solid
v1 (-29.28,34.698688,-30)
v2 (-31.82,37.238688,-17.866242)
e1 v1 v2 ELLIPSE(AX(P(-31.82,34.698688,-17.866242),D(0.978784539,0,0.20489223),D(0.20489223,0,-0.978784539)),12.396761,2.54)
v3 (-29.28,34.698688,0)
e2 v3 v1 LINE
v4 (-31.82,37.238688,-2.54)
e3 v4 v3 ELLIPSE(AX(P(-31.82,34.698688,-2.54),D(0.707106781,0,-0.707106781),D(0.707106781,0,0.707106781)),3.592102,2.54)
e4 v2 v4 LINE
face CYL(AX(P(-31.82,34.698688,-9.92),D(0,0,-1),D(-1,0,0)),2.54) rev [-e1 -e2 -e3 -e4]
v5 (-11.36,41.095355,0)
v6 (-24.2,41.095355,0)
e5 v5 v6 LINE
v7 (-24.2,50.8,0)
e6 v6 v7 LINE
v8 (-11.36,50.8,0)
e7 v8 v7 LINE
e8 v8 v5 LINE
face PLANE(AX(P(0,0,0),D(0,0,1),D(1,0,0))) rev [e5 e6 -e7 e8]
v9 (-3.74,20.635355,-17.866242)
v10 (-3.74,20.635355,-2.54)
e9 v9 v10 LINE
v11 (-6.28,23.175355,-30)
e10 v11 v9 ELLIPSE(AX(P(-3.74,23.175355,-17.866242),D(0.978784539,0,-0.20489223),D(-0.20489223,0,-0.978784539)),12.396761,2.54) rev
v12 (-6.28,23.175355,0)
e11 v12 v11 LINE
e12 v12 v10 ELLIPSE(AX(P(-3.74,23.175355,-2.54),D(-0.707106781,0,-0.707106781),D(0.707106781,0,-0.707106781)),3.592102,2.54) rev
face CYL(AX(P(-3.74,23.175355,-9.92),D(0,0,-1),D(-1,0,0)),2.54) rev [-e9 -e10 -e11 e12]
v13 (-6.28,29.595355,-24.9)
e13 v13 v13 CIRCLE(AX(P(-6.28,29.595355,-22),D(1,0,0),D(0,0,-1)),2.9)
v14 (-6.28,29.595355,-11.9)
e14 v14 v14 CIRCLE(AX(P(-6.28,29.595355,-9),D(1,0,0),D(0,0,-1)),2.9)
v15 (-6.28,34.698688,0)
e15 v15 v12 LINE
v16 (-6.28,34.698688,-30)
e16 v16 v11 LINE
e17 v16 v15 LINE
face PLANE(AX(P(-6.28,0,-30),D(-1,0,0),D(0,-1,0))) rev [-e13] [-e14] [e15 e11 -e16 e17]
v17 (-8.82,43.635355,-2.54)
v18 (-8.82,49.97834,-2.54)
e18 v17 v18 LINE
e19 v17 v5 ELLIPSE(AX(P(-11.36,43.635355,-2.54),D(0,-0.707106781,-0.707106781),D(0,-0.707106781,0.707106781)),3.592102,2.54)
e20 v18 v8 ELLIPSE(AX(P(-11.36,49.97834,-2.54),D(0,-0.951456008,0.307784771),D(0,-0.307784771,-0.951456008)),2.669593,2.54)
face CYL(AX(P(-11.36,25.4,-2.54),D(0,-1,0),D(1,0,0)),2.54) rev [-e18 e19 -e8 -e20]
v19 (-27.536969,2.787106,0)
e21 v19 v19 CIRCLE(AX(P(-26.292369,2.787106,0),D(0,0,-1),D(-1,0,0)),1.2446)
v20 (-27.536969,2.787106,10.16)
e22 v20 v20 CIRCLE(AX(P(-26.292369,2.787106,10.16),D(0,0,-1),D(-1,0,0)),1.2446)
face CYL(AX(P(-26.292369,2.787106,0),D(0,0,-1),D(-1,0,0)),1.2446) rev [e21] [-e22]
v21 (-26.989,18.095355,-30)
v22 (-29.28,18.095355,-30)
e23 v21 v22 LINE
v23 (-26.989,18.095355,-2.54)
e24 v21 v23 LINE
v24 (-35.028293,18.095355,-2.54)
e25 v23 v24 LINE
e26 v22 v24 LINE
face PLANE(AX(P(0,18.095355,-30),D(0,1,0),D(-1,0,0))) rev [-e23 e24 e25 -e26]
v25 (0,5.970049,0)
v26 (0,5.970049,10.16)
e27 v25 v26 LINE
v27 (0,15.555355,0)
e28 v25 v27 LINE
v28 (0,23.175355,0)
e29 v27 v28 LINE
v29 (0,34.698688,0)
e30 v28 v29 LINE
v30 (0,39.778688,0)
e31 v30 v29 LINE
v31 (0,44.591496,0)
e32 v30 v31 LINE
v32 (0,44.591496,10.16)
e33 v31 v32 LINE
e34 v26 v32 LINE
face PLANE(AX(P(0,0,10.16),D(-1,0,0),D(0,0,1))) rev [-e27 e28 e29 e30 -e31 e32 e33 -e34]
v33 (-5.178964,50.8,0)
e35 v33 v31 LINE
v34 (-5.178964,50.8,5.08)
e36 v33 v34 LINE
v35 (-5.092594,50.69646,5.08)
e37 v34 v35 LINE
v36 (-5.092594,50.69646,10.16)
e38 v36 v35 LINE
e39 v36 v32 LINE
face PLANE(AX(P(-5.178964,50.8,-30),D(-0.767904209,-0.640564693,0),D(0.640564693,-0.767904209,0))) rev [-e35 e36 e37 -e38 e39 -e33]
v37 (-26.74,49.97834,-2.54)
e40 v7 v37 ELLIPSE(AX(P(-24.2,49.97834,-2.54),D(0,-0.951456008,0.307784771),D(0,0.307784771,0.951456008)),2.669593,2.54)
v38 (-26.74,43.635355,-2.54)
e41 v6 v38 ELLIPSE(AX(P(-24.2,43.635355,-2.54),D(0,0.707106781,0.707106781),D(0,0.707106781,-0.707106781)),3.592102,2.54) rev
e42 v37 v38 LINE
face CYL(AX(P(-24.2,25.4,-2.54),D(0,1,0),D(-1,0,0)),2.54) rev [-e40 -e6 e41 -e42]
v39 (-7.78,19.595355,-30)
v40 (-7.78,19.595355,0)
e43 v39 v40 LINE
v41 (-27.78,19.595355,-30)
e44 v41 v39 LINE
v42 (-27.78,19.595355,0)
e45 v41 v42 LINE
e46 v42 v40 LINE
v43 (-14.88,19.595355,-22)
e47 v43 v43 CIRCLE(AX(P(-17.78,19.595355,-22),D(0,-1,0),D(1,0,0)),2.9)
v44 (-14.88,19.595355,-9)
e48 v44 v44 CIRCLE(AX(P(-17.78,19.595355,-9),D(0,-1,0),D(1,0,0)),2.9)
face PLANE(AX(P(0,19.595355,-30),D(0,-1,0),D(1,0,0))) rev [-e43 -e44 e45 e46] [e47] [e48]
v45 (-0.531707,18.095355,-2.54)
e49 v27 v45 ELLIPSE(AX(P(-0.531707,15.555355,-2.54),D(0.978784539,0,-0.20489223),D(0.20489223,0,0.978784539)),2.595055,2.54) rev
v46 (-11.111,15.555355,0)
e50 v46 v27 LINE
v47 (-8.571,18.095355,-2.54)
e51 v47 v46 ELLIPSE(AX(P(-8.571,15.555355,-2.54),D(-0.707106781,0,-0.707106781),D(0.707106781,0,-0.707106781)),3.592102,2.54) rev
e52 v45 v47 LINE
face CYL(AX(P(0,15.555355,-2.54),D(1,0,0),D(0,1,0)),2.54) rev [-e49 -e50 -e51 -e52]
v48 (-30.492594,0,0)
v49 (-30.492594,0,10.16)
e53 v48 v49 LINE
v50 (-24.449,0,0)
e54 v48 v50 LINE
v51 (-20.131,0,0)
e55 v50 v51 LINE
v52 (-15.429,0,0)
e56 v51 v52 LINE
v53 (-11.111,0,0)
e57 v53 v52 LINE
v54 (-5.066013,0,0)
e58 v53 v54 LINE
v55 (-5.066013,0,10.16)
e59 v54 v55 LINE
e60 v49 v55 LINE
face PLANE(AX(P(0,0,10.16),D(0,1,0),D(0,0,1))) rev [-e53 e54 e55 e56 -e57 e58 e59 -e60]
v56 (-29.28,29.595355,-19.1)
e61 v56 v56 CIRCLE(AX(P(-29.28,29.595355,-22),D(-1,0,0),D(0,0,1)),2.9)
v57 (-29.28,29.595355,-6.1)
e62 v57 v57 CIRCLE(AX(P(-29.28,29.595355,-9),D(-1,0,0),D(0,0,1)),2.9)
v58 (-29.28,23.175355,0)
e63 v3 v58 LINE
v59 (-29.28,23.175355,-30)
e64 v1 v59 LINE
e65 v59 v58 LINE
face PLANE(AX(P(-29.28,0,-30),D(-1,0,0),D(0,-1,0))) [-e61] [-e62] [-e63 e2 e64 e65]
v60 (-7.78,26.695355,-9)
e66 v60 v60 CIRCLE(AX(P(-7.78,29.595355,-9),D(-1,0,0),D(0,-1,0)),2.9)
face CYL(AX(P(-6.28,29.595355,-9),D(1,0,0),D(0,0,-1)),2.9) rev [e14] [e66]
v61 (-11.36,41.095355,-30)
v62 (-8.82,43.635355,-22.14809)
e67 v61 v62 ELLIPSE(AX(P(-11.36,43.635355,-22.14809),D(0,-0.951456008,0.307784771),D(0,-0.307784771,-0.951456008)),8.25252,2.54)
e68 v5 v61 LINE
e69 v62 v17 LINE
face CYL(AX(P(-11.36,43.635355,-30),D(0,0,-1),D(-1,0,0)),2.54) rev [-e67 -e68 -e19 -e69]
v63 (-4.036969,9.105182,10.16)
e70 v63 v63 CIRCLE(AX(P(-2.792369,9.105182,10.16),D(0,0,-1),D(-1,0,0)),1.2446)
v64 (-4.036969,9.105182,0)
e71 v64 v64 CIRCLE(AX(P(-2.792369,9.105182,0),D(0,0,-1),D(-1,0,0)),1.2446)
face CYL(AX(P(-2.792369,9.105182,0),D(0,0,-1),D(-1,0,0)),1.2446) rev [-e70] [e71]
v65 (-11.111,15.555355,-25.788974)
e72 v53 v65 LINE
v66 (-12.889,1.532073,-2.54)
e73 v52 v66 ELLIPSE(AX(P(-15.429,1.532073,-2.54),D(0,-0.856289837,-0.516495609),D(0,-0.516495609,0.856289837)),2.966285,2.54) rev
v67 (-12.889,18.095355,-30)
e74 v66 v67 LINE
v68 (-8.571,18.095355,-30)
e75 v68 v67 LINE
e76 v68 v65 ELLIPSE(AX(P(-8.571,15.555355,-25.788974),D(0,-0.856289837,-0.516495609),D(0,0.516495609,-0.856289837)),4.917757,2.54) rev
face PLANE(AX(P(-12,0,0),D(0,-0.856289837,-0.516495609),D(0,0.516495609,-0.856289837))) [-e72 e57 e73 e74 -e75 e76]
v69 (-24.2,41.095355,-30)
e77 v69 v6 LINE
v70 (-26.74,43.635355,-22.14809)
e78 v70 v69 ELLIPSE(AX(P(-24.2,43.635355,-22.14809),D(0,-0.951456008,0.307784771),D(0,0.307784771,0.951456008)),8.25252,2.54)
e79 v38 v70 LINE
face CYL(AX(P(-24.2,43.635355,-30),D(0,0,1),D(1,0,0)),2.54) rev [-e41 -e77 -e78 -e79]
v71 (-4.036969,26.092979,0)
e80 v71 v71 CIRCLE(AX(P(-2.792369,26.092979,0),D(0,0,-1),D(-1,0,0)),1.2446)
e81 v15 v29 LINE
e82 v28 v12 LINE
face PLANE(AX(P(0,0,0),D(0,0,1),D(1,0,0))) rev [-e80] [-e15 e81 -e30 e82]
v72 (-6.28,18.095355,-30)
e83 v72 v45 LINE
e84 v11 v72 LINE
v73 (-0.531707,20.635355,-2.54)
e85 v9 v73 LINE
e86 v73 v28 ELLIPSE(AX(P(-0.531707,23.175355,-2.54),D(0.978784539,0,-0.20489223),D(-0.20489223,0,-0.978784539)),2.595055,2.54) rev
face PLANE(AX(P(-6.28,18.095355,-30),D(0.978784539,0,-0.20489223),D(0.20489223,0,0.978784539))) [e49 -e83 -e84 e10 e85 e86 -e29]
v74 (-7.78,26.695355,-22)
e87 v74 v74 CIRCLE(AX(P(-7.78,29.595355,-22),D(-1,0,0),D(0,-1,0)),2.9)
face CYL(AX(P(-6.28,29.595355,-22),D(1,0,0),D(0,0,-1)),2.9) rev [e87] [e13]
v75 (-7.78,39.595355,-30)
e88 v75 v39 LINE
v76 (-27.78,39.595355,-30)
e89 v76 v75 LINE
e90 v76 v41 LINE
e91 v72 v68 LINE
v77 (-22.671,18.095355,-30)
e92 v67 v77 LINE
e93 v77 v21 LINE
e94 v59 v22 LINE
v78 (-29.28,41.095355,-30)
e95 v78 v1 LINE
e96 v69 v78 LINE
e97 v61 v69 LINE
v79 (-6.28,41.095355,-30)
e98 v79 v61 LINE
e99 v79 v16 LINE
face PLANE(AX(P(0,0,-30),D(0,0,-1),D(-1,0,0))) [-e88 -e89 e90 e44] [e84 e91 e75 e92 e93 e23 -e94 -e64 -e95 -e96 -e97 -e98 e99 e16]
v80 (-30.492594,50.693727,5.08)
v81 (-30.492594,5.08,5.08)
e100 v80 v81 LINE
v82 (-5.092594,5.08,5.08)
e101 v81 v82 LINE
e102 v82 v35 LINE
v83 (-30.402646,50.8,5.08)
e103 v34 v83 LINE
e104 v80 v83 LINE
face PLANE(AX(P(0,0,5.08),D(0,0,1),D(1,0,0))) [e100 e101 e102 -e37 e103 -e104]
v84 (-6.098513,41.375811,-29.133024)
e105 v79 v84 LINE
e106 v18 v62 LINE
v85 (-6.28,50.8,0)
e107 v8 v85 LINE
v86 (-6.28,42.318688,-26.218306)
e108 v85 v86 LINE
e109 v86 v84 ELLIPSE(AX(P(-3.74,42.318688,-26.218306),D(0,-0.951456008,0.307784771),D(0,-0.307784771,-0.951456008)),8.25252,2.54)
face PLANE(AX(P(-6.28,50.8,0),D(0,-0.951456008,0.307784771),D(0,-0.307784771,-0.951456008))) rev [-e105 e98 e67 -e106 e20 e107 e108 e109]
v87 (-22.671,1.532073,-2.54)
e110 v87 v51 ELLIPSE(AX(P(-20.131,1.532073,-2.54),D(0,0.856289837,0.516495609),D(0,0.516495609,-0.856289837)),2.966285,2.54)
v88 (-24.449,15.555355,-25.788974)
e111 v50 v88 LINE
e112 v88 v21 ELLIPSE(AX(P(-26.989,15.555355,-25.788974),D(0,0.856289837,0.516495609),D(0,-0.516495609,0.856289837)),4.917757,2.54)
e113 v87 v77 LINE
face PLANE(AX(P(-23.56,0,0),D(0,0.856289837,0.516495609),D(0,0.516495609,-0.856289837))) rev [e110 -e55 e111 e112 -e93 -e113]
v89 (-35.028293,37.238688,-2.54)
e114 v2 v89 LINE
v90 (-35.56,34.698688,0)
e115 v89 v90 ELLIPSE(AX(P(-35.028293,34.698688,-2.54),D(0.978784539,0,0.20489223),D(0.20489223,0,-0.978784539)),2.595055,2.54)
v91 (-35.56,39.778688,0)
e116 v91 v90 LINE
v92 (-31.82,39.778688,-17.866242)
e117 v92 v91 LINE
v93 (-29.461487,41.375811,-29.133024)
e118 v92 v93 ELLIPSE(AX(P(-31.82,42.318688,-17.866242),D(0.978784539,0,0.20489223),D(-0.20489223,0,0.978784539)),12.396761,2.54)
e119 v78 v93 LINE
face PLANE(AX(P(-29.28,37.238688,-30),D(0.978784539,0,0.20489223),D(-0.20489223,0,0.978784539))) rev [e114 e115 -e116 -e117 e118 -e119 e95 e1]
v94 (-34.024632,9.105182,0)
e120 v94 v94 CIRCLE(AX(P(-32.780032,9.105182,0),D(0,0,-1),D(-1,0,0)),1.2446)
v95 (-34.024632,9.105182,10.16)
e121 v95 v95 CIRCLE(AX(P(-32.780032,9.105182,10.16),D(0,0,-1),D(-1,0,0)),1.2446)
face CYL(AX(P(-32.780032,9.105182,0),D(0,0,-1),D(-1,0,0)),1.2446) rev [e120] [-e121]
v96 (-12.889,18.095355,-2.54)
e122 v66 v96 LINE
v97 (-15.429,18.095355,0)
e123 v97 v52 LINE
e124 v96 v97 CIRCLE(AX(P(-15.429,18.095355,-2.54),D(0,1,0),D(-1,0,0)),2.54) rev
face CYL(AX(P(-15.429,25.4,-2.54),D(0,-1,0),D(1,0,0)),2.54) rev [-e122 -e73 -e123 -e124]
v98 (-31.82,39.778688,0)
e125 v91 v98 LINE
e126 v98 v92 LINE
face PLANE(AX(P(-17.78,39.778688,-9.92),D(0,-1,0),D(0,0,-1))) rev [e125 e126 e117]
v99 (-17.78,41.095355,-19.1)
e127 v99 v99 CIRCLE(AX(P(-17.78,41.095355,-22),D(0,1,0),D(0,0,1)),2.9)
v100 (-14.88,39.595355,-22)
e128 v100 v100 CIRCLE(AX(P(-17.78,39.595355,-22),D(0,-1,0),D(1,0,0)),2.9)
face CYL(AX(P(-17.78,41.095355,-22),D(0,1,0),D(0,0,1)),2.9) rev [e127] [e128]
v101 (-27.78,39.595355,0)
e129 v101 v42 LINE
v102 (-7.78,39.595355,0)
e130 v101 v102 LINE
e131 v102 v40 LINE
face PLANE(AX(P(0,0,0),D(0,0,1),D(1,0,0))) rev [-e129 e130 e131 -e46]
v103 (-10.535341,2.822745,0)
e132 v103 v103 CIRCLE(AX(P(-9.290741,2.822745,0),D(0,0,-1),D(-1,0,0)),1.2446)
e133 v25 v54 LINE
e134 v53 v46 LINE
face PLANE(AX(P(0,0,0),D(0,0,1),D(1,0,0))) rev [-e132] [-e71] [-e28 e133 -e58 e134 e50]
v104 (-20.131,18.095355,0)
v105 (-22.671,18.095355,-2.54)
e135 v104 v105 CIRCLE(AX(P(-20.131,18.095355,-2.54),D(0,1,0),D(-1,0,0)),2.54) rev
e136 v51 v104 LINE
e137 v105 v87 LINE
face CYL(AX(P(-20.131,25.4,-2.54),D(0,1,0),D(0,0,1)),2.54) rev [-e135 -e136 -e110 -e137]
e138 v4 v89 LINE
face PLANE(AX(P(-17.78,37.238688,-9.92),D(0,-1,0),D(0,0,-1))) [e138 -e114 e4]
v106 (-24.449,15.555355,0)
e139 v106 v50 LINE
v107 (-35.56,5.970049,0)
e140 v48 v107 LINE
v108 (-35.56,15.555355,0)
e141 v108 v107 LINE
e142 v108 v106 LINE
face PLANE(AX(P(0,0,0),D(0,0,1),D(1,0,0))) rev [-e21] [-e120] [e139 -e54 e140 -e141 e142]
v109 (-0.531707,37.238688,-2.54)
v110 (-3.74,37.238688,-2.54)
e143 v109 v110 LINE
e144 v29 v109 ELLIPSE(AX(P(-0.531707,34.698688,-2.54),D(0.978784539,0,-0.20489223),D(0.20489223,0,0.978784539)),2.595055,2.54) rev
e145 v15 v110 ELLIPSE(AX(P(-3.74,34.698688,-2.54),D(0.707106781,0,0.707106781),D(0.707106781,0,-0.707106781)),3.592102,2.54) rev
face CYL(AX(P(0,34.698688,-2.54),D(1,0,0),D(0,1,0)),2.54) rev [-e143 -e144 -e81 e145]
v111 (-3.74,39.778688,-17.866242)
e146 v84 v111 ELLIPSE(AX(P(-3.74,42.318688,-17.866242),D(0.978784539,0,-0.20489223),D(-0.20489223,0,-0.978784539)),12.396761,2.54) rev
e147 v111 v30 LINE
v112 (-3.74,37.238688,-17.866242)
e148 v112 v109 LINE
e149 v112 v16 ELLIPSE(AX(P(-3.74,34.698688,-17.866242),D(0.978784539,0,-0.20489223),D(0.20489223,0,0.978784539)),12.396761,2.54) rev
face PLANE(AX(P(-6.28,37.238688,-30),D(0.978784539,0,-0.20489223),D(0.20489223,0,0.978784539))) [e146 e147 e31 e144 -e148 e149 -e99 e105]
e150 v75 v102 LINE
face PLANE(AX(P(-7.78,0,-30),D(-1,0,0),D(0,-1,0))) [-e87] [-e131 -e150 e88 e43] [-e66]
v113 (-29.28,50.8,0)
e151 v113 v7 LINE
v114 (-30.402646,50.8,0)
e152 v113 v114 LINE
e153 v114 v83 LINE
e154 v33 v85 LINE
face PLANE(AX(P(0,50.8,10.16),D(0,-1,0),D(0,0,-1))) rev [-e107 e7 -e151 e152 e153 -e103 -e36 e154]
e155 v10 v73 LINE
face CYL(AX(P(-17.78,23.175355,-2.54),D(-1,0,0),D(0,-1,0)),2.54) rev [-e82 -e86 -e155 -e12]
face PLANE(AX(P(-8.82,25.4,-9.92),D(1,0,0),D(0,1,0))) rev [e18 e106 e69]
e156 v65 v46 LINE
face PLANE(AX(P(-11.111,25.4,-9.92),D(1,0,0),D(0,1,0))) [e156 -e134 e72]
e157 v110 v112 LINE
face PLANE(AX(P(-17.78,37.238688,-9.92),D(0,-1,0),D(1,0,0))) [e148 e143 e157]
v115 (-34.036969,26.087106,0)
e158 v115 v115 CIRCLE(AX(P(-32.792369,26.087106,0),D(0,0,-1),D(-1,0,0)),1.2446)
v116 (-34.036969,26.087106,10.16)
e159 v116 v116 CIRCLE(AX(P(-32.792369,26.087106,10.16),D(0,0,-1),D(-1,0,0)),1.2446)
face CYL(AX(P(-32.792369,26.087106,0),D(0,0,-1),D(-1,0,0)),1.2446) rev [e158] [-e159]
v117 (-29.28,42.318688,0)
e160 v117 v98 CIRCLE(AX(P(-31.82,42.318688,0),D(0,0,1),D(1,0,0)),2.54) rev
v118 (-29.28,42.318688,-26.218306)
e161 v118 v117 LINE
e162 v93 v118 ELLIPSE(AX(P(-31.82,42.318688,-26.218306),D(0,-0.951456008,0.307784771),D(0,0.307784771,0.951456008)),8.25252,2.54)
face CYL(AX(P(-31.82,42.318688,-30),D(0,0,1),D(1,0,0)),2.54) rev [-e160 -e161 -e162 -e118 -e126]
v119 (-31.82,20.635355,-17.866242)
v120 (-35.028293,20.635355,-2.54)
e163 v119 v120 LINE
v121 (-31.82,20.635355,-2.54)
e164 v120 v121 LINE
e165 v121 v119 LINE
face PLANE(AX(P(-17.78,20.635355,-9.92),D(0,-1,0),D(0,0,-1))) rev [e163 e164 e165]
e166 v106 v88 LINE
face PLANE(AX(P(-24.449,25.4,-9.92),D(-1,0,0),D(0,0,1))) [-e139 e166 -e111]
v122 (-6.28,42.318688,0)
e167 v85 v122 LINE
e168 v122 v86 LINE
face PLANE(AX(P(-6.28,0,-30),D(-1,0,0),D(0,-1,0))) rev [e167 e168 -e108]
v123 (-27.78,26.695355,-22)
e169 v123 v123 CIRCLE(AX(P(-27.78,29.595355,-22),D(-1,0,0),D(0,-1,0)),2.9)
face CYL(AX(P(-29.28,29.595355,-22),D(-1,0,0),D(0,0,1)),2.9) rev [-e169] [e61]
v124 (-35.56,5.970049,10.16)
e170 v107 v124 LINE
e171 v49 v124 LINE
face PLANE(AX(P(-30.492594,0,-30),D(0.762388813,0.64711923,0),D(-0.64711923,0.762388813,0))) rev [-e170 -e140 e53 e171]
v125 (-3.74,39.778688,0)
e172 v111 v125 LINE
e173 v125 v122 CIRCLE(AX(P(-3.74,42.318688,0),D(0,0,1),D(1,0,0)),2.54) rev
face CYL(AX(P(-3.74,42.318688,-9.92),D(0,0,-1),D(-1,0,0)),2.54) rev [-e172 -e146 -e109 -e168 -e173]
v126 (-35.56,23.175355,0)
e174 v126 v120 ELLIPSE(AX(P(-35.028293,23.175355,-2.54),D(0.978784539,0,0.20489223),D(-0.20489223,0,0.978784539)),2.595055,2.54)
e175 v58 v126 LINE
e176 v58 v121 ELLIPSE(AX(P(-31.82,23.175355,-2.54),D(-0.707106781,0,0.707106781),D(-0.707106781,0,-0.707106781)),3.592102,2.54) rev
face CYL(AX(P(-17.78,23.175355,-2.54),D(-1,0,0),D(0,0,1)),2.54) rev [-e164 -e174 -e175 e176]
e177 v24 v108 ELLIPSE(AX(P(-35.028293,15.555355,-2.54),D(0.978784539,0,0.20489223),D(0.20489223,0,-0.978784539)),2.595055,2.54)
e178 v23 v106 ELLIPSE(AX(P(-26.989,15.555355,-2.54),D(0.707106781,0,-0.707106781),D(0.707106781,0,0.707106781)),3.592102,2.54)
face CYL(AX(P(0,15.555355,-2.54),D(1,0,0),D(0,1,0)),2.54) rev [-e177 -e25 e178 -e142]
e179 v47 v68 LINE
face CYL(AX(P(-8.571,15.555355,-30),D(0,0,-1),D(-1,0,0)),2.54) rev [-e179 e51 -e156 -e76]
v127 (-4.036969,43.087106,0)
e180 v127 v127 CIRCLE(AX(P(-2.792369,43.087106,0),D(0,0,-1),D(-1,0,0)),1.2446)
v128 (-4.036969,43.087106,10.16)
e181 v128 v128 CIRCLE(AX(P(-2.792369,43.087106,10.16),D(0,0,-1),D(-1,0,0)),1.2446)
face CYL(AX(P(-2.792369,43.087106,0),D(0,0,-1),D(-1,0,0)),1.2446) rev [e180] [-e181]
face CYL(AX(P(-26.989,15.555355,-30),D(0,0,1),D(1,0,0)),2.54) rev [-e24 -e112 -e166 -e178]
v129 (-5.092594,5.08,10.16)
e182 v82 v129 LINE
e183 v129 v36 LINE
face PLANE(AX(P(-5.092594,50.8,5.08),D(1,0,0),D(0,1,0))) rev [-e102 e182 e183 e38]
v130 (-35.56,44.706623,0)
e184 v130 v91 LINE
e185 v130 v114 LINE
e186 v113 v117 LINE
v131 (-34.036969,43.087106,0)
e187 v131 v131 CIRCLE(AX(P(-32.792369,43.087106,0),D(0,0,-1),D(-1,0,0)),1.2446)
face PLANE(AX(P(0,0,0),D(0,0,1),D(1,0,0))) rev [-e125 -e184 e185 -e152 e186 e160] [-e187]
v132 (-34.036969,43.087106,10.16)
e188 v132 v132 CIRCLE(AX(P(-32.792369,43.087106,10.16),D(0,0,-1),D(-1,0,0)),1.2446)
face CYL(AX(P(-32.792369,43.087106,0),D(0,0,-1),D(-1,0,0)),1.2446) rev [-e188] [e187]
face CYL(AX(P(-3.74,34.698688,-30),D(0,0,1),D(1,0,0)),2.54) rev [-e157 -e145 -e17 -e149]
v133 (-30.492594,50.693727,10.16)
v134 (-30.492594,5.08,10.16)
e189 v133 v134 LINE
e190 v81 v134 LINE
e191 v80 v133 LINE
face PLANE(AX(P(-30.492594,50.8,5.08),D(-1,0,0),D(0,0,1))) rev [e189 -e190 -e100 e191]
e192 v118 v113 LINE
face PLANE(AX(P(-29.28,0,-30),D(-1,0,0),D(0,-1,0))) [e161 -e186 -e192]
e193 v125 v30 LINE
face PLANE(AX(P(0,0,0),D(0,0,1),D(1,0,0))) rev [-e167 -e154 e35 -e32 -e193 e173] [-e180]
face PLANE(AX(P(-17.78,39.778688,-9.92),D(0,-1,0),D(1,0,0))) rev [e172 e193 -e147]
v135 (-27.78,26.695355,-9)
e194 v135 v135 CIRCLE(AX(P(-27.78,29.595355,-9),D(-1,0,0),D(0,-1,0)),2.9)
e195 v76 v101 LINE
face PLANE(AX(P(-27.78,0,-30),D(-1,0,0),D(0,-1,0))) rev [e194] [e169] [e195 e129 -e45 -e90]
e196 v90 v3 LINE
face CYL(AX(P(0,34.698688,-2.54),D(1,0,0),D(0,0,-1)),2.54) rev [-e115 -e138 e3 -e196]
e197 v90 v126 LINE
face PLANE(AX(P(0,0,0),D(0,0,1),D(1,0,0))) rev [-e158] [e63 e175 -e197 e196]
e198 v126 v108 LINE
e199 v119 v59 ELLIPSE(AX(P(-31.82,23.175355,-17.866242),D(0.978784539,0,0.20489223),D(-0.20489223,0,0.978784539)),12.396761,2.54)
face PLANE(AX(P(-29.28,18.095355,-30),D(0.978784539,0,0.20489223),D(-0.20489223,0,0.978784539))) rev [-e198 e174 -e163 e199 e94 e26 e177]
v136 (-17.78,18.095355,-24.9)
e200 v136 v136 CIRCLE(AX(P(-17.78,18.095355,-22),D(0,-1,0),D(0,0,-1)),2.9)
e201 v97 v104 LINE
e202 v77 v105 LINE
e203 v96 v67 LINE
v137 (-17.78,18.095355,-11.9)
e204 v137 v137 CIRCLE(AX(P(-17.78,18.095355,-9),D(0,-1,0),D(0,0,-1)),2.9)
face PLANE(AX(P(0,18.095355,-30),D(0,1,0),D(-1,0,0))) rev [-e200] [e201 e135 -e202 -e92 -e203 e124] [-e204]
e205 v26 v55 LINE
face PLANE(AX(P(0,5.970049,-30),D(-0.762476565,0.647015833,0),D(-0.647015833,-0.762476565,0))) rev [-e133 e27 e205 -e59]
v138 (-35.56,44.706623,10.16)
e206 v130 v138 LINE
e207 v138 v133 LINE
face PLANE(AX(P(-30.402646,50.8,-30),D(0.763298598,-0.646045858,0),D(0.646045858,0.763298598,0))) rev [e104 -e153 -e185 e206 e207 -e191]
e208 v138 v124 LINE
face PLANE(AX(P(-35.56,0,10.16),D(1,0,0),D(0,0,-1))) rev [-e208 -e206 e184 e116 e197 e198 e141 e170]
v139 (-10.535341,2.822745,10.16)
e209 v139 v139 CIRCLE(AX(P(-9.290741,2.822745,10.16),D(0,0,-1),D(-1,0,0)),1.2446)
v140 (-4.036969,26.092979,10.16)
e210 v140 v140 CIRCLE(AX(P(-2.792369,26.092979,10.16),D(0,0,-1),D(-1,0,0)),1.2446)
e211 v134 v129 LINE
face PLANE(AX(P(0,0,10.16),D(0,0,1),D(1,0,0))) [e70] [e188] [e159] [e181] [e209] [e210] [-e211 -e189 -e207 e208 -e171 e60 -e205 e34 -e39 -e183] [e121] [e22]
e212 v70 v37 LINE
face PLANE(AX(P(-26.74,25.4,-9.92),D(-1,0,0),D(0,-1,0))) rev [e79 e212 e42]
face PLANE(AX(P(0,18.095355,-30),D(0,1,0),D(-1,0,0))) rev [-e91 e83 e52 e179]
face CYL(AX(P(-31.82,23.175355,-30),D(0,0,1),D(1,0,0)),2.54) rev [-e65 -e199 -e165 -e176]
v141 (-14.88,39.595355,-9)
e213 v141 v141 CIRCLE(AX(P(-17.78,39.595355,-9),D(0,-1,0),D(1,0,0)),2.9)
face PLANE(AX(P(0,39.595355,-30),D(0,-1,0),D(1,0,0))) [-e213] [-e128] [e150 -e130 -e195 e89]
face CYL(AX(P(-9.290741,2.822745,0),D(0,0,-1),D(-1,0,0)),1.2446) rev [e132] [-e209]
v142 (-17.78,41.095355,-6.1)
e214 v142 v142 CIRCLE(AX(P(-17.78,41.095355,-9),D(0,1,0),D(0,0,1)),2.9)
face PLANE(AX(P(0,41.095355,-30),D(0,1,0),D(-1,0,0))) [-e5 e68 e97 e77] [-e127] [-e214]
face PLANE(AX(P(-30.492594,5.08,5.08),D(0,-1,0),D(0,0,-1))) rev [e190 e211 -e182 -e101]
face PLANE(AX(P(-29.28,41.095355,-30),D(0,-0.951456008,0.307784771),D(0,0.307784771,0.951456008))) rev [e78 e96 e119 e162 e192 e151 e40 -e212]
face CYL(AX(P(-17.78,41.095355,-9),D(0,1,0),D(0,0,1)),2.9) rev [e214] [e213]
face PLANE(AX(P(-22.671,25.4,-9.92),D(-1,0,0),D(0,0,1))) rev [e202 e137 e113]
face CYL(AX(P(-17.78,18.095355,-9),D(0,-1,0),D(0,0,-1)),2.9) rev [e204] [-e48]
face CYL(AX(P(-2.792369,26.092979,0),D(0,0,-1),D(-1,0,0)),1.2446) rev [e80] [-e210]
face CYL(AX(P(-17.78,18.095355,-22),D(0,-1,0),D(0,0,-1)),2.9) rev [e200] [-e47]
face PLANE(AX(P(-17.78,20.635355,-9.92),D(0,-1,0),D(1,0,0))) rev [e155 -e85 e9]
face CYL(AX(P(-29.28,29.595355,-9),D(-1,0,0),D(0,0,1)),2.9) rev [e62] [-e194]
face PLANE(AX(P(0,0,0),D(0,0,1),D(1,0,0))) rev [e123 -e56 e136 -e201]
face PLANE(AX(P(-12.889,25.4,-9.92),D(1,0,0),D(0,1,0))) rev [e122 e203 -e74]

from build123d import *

# Parameters (mm, degrees)
SKETCH1_W                     = 35.56
SKETCH1_H                     = 50.8
BOSS_EXTRUDE1_DEPTH           = 10.16
SKETCH2_W                     = 25.4
SKETCH2_H                     = 45.72
CUT_EXTRUDE2_DEPTH            = 5.08
F_40_0_098_DIAMETER_HOLE1_D   = 2.4892
SKETCH7_W                     = 23
SKETCH7_H                     = 23
SKETCH7_W_2                   = 20
SKETCH7_H_2                   = 20
BOSS_EXTRUDE2_DEPTH           = 30
CUT_EXTRUDE3_DEPTH            = 74.878137497
RIB17_REACH                   = 58.869
SKETCH12_WALL_W               = 146.388686102
SKETCH12_WALL_H               = 2.54
M5_CLEARANCE_HOLE2_AT_2_COUNT = 2
M5_CLEARANCE_HOLE2_AT_2_PITCH = 12.999999966
CIRPATTERN2_COUNT             = 4
LPATTERN3_COUNT               = 2
LPATTERN3_PITCH               = 19.143333316
MIRROR2_COPY_1_REACH          = 58.869
MIRROR2_COPY_1_SKETCH_W       = 146.388686102
MIRROR2_COPY_1_SKETCH_H       = 2.54
RIB18_REACH                   = 67.863
SKETCH20_WALL_W               = 165.256981074
SKETCH20_WALL_H               = 2.54
RIB19_START                   = -2.54
RIB19_DEPTH                   = 2.54
RIB27_REACH                   = 65.527
SKETCH23_WALL_W               = 164.089399604
SKETCH23_WALL_H               = 1.778
FILLET1_R                     = 2.54


# Read off the part's stored shape, not the designer's step: Rib19
with BuildPart() as part:
    # Sketch1 → Boss-Extrude1 (new body)
    with BuildSketch(Plane.XY):
        with Locations((-17.78, 25.4)):
            Rectangle(SKETCH1_W, SKETCH1_H)
    extrude(amount=BOSS_EXTRUDE1_DEPTH)

    # Sketch2 → Cut-Extrude2 (cut)
    with BuildSketch(Plane.XY.offset(10.16)):
        with Locations((-17.792594088, 27.94)):
            Rectangle(SKETCH2_W, SKETCH2_H)
    extrude(amount=-CUT_EXTRUDE2_DEPTH, mode=Mode.SUBTRACT)

    # #40 (0.098) Diameter Hole1 (through all)
    with Locations(Plane(origin=(0, 0, 0), x_dir=(-1, 0, 0), z_dir=(0, 0, -1))):
        with Locations((2.792369004, 43.087106138), (2.792369004, 26.092979092), (2.792369004, 9.105182099), (9.290740849, 2.822744672), (26.292369004, 2.787106138), (32.780032006, 9.105182099), (32.792369004, 26.087106138), (32.792369004, 43.087106138)):
            Hole(F_40_0_098_DIAMETER_HOLE1_D / 2)

    # Sketch7 → Boss-Extrude2 (add)
    with BuildSketch(Plane(origin=(0, 0, 0), x_dir=(-1, 0, 0), z_dir=(0, 0, -1))):
        with Locations((17.78, 29.595354636)):
            Rectangle(SKETCH7_W, SKETCH7_H)
        with Locations((17.78, 29.595354636)):
            Rectangle(SKETCH7_W_2, SKETCH7_H_2, mode=Mode.SUBTRACT)
    extrude(amount=BOSS_EXTRUDE2_DEPTH)

    # Sketch8 → Cut-Extrude3 (cut, through all)
    with BuildSketch(Plane.XY.offset(10.16)):
        Polygon((-5.178964387, 50.8), (0, 44.591495864), (0, 50.8), align=None)
        Polygon((-35.56, 44.706622517), (-35.56, 50.8), (-30.402645731, 50.8), align=None)
        Polygon((-35.56, 5.970049098), (-35.56, 0), (-30.492594088, 0), align=None)
        Polygon((-5.092594088, -0.031324356), (0, 0), (0, 5.970049098), align=None)
    extrude(amount=-CUT_EXTRUDE3_DEPTH, mode=Mode.SUBTRACT)

    # Sketch12 wall → Rib17 (add, up to next)
    with BuildSketch(Plane(origin=(-32.42, 18.095354636, -15), x_dir=(-0.204892230188, 0, 0.978784539114), z_dir=(-0.978784539114, 0, -0.204892230188)), mode=Mode.PRIVATE) as rib17_sk1:
        with Locations((0, 1.27)):
            Rectangle(SKETCH12_WALL_W, SKETCH12_WALL_H)
    rib17_tool1 = extrude(rib17_sk1.sketch, amount=-RIB17_REACH, mode=Mode.PRIVATE) - part.part
    rib17 = rib17_tool1.solids().sort_by_distance((-32.42, 18.095354636, -15))[0]
    add(rib17)

    # Sketch19 → M5 Clearance Hole2 (revolve, cut)
    with BuildSketch(Plane(origin=(-17.78, 41.095354636, -9.000000034), x_dir=(0, 0, 1), z_dir=(1, 0, 0))):
        Polygon((0, 0), (0, 7.742483795), (2.9, 5.999988), (2.9, 0), align=None)
    m5_clearance_hole2 = revolve(axis=Axis((-17.78, 47.445354636, -9.000000034), (0, -1, 0)), mode=Mode.SUBTRACT)

    # M5 Clearance Hole2 at 2: M5 Clearance Hole2 ×2
    with Locations(*[(0, 0, -i * M5_CLEARANCE_HOLE2_AT_2_PITCH) for i in range(1, M5_CLEARANCE_HOLE2_AT_2_COUNT)]):
        add(m5_clearance_hole2, mode=Mode.SUBTRACT)

    # CirPattern2: M5 Clearance Hole2 ×4 about axis
    cirpattern2_axis = Axis((-17.78, 29.595354636, -31.5), (0, 0, 1))
    for i in range(1, CIRPATTERN2_COUNT):
        add(m5_clearance_hole2.rotate(cirpattern2_axis, i * 360 / CIRPATTERN2_COUNT), mode=Mode.SUBTRACT)

    # CirPattern2 copy 1 sketch → CirPattern2 copy 1 (revolve, cut)
    with BuildSketch(Plane(origin=(-29.28, 29.595354636, -22), x_dir=(0, 0, 1), z_dir=(0, 1, 0))):
        Polygon((0, 0), (0, 7.742483795), (2.9, 5.999988), (2.9, 0), align=None)
    revolve(axis=Axis((-35.63, 29.595354636, -22), (1, 0, 0)), mode=Mode.SUBTRACT)

    # CirPattern2 copy 2 sketch → CirPattern2 copy 2 (revolve, cut)
    with BuildSketch(Plane(origin=(-17.78, 18.095354636, -22), x_dir=(0, 0, 1), z_dir=(-1, 0, 0))):
        Polygon((0, 0), (0, 7.742483795), (2.9, 5.999988), (2.9, 0), align=None)
    revolve(axis=Axis((-17.78, 11.745354636, -22), (0, 1, 0)), mode=Mode.SUBTRACT)

    # CirPattern2 copy 3 sketch → CirPattern2 copy 3 (revolve, cut)
    with BuildSketch(Plane(origin=(-6.28, 29.595354636, -22), x_dir=(0, 0, 1), z_dir=(0, -1, 0))):
        Polygon((0, 0), (0, 7.742483795), (2.9, 5.999988), (2.9, 0), align=None)
    revolve(axis=Axis((0.07, 29.595354636, -22), (-1, 0, 0)), mode=Mode.SUBTRACT)

    # LPattern3: Rib17 ×2
    with Locations(*[(0, i * LPATTERN3_PITCH, 0) for i in range(1, LPATTERN3_COUNT)]):
        add(rib17)

    # Mirror2: Rib17 across plane
    add(rib17.mirror(Plane.ZY.offset(17.78)))

    # Mirror2 copy 1 sketch → Mirror2 copy 1 (add, up to next)
    with BuildSketch(Plane(origin=(-3.14, 37.238687952, -15), x_dir=(0.204892230188, 0, 0.978784539114), z_dir=(0.978784539114, 0, -0.204892230188)), mode=Mode.PRIVATE) as mirror2_copy_1_sk1:
        with Locations((0, -1.27)):
            Rectangle(MIRROR2_COPY_1_SKETCH_W, MIRROR2_COPY_1_SKETCH_H)
    mirror2_copy_1_tool1 = extrude(mirror2_copy_1_sk1.sketch, amount=-MIRROR2_COPY_1_REACH, mode=Mode.PRIVATE) - part.part
    add(mirror2_copy_1_tool1.solids().sort_by_distance((-3.14, 37.238687952, -15))[0])

    # Sketch20 wall → Rib18 (add, up to next)
    with BuildSketch(Plane(origin=(-6.28, 45.947677318, -15), x_dir=(0, -0.307784771149, -0.951456007732), z_dir=(0, 0.951456007732, -0.307784771149)), mode=Mode.PRIVATE) as rib18_sk1:
        with Locations((0, 1.27)):
            Rectangle(SKETCH20_WALL_W, SKETCH20_WALL_H)
    rib18_tool1 = extrude(rib18_sk1.sketch, amount=-RIB18_REACH, mode=Mode.PRIVATE) - part.part
    add(rib18_tool1.solids().sort_by_distance((-6.28, 45.947677318, -15))[0])

    # Rib19 outline → Rib19 (add)
    with BuildSketch(Plane.ZY.offset(29.28).offset(RIB19_START)):
        Polygon((0, 50.8), (-30, 41.095354636), (0, 41.095354636), align=None)
    extrude(amount=RIB19_DEPTH)

    # Sketch23 wall → Rib27 (add, up to next)
    with BuildSketch(Plane(origin=(-23.560000124, 9.047677318, -15), x_dir=(0, 0.516495609283, -0.856289837375), z_dir=(0, -0.856289837375, -0.516495609283)), mode=Mode.PRIVATE) as rib27_sk1:
        Rectangle(SKETCH23_WALL_W, SKETCH23_WALL_H)
    rib27_tool1 = extrude(rib27_sk1.sketch, amount=-RIB27_REACH, mode=Mode.PRIVATE) - part.part
    rib27 = rib27_tool1.solids().sort_by_distance((-23.560000124, 9.047677318, -15))[0]
    add(rib27)

    # Mirror3: Rib27 across plane
    add(rib27.mirror(Plane.ZY.offset(17.78)))

    # Fillet1
    # the kernel refuses this fillet: 2.54 mm, written as the material it adds along each edge
    with BuildSketch(Plane(origin=(-29.28, 20.635354636, -36.35), x_dir=(0, 1, 0), z_dir=(0, 0, 1))) as fillet1_piece_1_section:
        with BuildLine():
            CenterArc((FILLET1_R, FILLET1_R), FILLET1_R, 180, 90)
            Line((0, FILLET1_R), (0, 0))
            Line((0, 0), (FILLET1_R, 0))
        make_face()
    fillet1_piece_1 = extrude(amount=42.7, mode=Mode.PRIVATE)
    fillet1_piece_1 = split(fillet1_piece_1, bisect_by=Plane(origin=(-32.507751913, 21.276865284, -14.580802962), z_dir=(0.9787845391139913, 0, 0.20489223018799818)), keep=Keep.TOP, mode=Mode.PRIVATE)
    fillet1_piece_1 = split(fillet1_piece_1, bisect_by=Plane(origin=(-29.701450571, 21.276865284, 5.08), z_dir=(0, 0, -1)), keep=Keep.TOP, mode=Mode.PRIVATE)
    add(fillet1_piece_1)
    with BuildSketch(Plane(origin=(-22.93, 20.635354636, 0), x_dir=(0, 1, 0), z_dir=(-1, 0, 0))) as fillet1_piece_2_section:
        with BuildLine():
            CenterArc((FILLET1_R, FILLET1_R), FILLET1_R, 180, 90)
            Line((0, FILLET1_R), (0, 0))
            Line((0, 0), (FILLET1_R, 0))
        make_face()
    fillet1_piece_2 = extrude(amount=18.98, mode=Mode.PRIVATE)
    fillet1_piece_2 = split(fillet1_piece_2, bisect_by=Plane(origin=(-35.31348635, 21.207242958, -1.177612978), z_dir=(0.9787845391139913, 0, 0.20489223018799818)), keep=Keep.TOP, mode=Mode.PRIVATE)
    fillet1_piece_2 = split(fillet1_piece_2, bisect_by=Plane(origin=(-27.78, 21.207242958, -0.559647827), z_dir=(-1, 0, 0)), keep=Keep.TOP, mode=Mode.PRIVATE)
    add(fillet1_piece_2)
    with BuildSketch(Plane(origin=(-29.28, 37.238687952, 6.35), x_dir=(0, -1, 0), z_dir=(0, 0, -1))) as fillet1_piece_3_section:
        with BuildLine():
            CenterArc((FILLET1_R, FILLET1_R), FILLET1_R, 180, 90)
            Line((0, FILLET1_R), (0, 0))
            Line((0, 0), (FILLET1_R, 0))
        make_face()
    fillet1_piece_3 = extrude(amount=42.7, mode=Mode.PRIVATE)
    fillet1_piece_3 = split(fillet1_piece_3, bisect_by=Plane(origin=(-32.507751913, 36.597177304, -14.580802962), z_dir=(0.9787845391139913, 0, 0.20489223018799818)), keep=Keep.TOP, mode=Mode.PRIVATE)
    fillet1_piece_3 = split(fillet1_piece_3, bisect_by=Plane(origin=(-29.701450571, 36.597177304, 5.08), z_dir=(0, 0, -1)), keep=Keep.TOP, mode=Mode.PRIVATE)
    add(fillet1_piece_3)
    with BuildSketch(Plane(origin=(-29.28, 39.778687952, -36.35), x_dir=(0, 1, 0), z_dir=(0, 0, 1))) as fillet1_piece_4_section:
        with BuildLine():
            CenterArc((FILLET1_R, FILLET1_R), FILLET1_R, 180, 90)
            Line((0, FILLET1_R), (0, 0))
            Line((0, 0), (FILLET1_R, 0))
        make_face()
    fillet1_piece_4 = extrude(amount=42.7, mode=Mode.PRIVATE)
    fillet1_piece_4 = split(fillet1_piece_4, bisect_by=Plane(origin=(-29.702374343, 45.729179403, -15.675443274), z_dir=(0, -0.9514560077315756, 0.3077847711494059)), keep=Keep.TOP, mode=Mode.PRIVATE)
    fillet1_piece_4 = split(fillet1_piece_4, bisect_by=Plane(origin=(-32.515065023, 40.417190965, -14.545867724), z_dir=(0.9787845391139913, 0, 0.20489223018799818)), keep=Keep.TOP, mode=Mode.PRIVATE)
    fillet1_piece_4 = split(fillet1_piece_4, bisect_by=Plane(origin=(-29.702374343, 40.417190965, 5.08), z_dir=(0, 0, -1)), keep=Keep.TOP, mode=Mode.PRIVATE)
    add(fillet1_piece_4)
    with BuildSketch(Plane(origin=(-41.91, 37.238687952, 0), x_dir=(0, -1, 0), z_dir=(1, 0, 0))) as fillet1_piece_5_section:
        with BuildLine():
            CenterArc((FILLET1_R, FILLET1_R), FILLET1_R, 180, 90)
            Line((0, FILLET1_R), (0, 0))
            Line((0, 0), (FILLET1_R, 0))
        make_face()
    fillet1_piece_5 = extrude(amount=18.98, mode=Mode.PRIVATE)
    fillet1_piece_5 = split(fillet1_piece_5, bisect_by=Plane(origin=(-35.31348635, 36.66679963, -1.177612978), z_dir=(0.9787845391139913, 0, 0.20489223018799818)), keep=Keep.TOP, mode=Mode.PRIVATE)
    fillet1_piece_5 = split(fillet1_piece_5, bisect_by=Plane(origin=(-27.78, 36.66679963, -0.559647827), z_dir=(-1, 0, 0)), keep=Keep.TOP, mode=Mode.PRIVATE)
    add(fillet1_piece_5)
    with BuildSketch(Plane(origin=(-6.28, 20.635354636, -36.35), x_dir=(0, 1, 0), z_dir=(0, 0, 1))) as fillet1_piece_6_section:
        with BuildLine():
            CenterArc((FILLET1_R, -FILLET1_R), FILLET1_R, 90, 90)
            Line((0, -FILLET1_R), (0, 0))
            Line((0, 0), (FILLET1_R, 0))
        make_face()
    fillet1_piece_6 = extrude(amount=42.7, mode=Mode.PRIVATE)
    fillet1_piece_6 = split(fillet1_piece_6, bisect_by=Plane(origin=(-3.0550421, 21.27996789, -14.594150159), z_dir=(-0.9787845391139913, 0, 0.20489223018799815)), keep=Keep.TOP, mode=Mode.PRIVATE)
    fillet1_piece_6 = split(fillet1_piece_6, bisect_by=Plane(origin=(-5.863912317, 21.27996789, 5.08), z_dir=(0, 0, -1)), keep=Keep.TOP, mode=Mode.PRIVATE)
    add(fillet1_piece_6)
    with BuildSketch(Plane(origin=(-12.63, 20.635354636, 0), x_dir=(0, 1, 0), z_dir=(1, 0, 0))) as fillet1_piece_7_section:
        with BuildLine():
            CenterArc((FILLET1_R, -FILLET1_R), FILLET1_R, 90, 90)
            Line((0, -FILLET1_R), (0, 0))
            Line((0, 0), (FILLET1_R, 0))
        make_face()
    fillet1_piece_7 = extrude(amount=18.98, mode=Mode.PRIVATE)
    fillet1_piece_7 = split(fillet1_piece_7, bisect_by=Plane(origin=(-0.24651365, 21.207242958, -1.177612978), z_dir=(-0.9787845391139913, 0, 0.20489223018799815)), keep=Keep.TOP, mode=Mode.PRIVATE)
    fillet1_piece_7 = split(fillet1_piece_7, bisect_by=Plane(origin=(-7.78, 21.207242958, -0.559647827), z_dir=(1, 0, 0)), keep=Keep.TOP, mode=Mode.PRIVATE)
    add(fillet1_piece_7)
    with BuildSketch(Plane(origin=(-6.28, 37.238687952, 6.35), x_dir=(0, -1, 0), z_dir=(0, 0, -1))) as fillet1_piece_8_section:
        with BuildLine():
            CenterArc((FILLET1_R, -FILLET1_R), FILLET1_R, 90, 90)
            Line((0, -FILLET1_R), (0, 0))
            Line((0, 0), (FILLET1_R, 0))
        make_face()
    fillet1_piece_8 = extrude(amount=42.7, mode=Mode.PRIVATE)
    fillet1_piece_8 = split(fillet1_piece_8, bisect_by=Plane(origin=(-3.0550421, 36.594074698, -14.594150159), z_dir=(-0.9787845391139913, 0, 0.20489223018799818)), keep=Keep.TOP, mode=Mode.PRIVATE)
    fillet1_piece_8 = split(fillet1_piece_8, bisect_by=Plane(origin=(-5.863912317, 36.594074698, 5.08), z_dir=(0, 0, -1)), keep=Keep.TOP, mode=Mode.PRIVATE)
    add(fillet1_piece_8)
    with BuildSketch(Plane(origin=(6.35, 37.238687952, 0), x_dir=(0, -1, 0), z_dir=(-1, 0, 0))) as fillet1_piece_9_section:
        with BuildLine():
            CenterArc((FILLET1_R, -FILLET1_R), FILLET1_R, 90, 90)
            Line((0, -FILLET1_R), (0, 0))
            Line((0, 0), (FILLET1_R, 0))
        make_face()
    fillet1_piece_9 = extrude(amount=18.98, mode=Mode.PRIVATE)
    fillet1_piece_9 = split(fillet1_piece_9, bisect_by=Plane(origin=(-0.24651365, 36.66679963, -1.177612978), z_dir=(-0.9787845391139913, 0, 0.20489223018799818)), keep=Keep.TOP, mode=Mode.PRIVATE)
    fillet1_piece_9 = split(fillet1_piece_9, bisect_by=Plane(origin=(-7.78, 36.66679963, -0.559647827), z_dir=(1, 0, 0)), keep=Keep.TOP, mode=Mode.PRIVATE)
    add(fillet1_piece_9)
    with BuildSketch(Plane(origin=(-6.28, 39.778687952, -36.35), x_dir=(0, 1, 0), z_dir=(0, 0, 1))) as fillet1_piece_10_section:
        with BuildLine():
            CenterArc((FILLET1_R, -FILLET1_R), FILLET1_R, 90, 90)
            Line((0, -FILLET1_R), (0, 0))
            Line((0, 0), (FILLET1_R, 0))
        make_face()
    fillet1_piece_10 = extrude(amount=42.7, mode=Mode.PRIVATE)
    fillet1_piece_10 = split(fillet1_piece_10, bisect_by=Plane(origin=(-3.047685275, 40.420280339, -14.559006093), z_dir=(-0.9787845391139913, 0, 0.20489223018799818)), keep=Keep.TOP, mode=Mode.PRIVATE)
    fillet1_piece_10 = split(fillet1_piece_10, bisect_by=Plane(origin=(-5.862995196, 45.725785141, -15.685935969), z_dir=(0, -0.9514560077317347, 0.30778477114891417)), keep=Keep.TOP, mode=Mode.PRIVATE)
    fillet1_piece_10 = split(fillet1_piece_10, bisect_by=Plane(origin=(-5.862995196, 40.420280339, 5.08), z_dir=(0, 0, -1)), keep=Keep.TOP, mode=Mode.PRIVATE)
    add(fillet1_piece_10)
    with BuildSketch(Plane(origin=(-8.82, 57.15, 0), x_dir=(0, 0, -1), z_dir=(0, -1, 0))) as fillet1_piece_11_section:
        with BuildLine():
            CenterArc((FILLET1_R, -FILLET1_R), FILLET1_R, 90, 90)
            Line((0, -FILLET1_R), (0, 0))
            Line((0, 0), (FILLET1_R, 0))
        make_face()
    fillet1_piece_11 = extrude(amount=22.404645364, mode=Mode.PRIVATE)
    fillet1_piece_11 = split(fillet1_piece_11, bisect_by=Plane(origin=(-9.391888322, 50.167867972, -1.954111678), z_dir=(0, -0.9514560077317347, 0.30778477114891417)), keep=Keep.TOP, mode=Mode.PRIVATE)
    fillet1_piece_11 = split(fillet1_piece_11, bisect_by=Plane(origin=(-9.391888322, 39.595354636, -0.559647827), z_dir=(0, 1, 0)), keep=Keep.TOP, mode=Mode.PRIVATE)
    add(fillet1_piece_11)
    with BuildSketch(Plane(origin=(-8.82, 41.095354636, 0), x_dir=(-1, 0, 0), z_dir=(0, 0, -1))) as fillet1_piece_12_section:
        with BuildLine():
            CenterArc((FILLET1_R, FILLET1_R), FILLET1_R, 180, 90)
            Line((0, FILLET1_R), (0, 0))
            Line((0, 0), (FILLET1_R, 0))
        make_face()
    fillet1_piece_12 = extrude(amount=36.35, mode=Mode.PRIVATE)
    fillet1_piece_12 = split(fillet1_piece_12, bisect_by=Plane(origin=(-9.401958506, 45.784971986, -15.502971493), z_dir=(0, -0.9514560077317347, 0.30778477114891417)), keep=Keep.TOP, mode=Mode.PRIVATE)
    add(fillet1_piece_12)
    with BuildSketch(Plane(origin=(-26.74, 34.745354636, 0), x_dir=(1, 0, 0), z_dir=(0, 1, 0))) as fillet1_piece_13_section:
        with BuildLine():
            CenterArc((FILLET1_R, FILLET1_R), FILLET1_R, 180, 90)
            Line((0, FILLET1_R), (0, 0))
            Line((0, 0), (FILLET1_R, 0))
        make_face()
    fillet1_piece_13 = extrude(amount=22.404645364, mode=Mode.PRIVATE)
    fillet1_piece_13 = split(fillet1_piece_13, bisect_by=Plane(origin=(-26.168111678, 50.167867972, -1.954111678), z_dir=(0, -0.9514560077315756, 0.3077847711494059)), keep=Keep.TOP, mode=Mode.PRIVATE)
    fillet1_piece_13 = split(fillet1_piece_13, bisect_by=Plane(origin=(-26.168111678, 39.595354636, -0.559647827), z_dir=(0, 1, 0)), keep=Keep.TOP, mode=Mode.PRIVATE)
    add(fillet1_piece_13)
    with BuildSketch(Plane(origin=(-26.74, 41.095354636, -36.35), x_dir=(1, 0, 0), z_dir=(0, 0, 1))) as fillet1_piece_14_section:
        with BuildLine():
            CenterArc((FILLET1_R, FILLET1_R), FILLET1_R, 180, 90)
            Line((0, FILLET1_R), (0, 0))
            Line((0, 0), (FILLET1_R, 0))
        make_face()
    fillet1_piece_14 = extrude(amount=36.35, mode=Mode.PRIVATE)
    fillet1_piece_14 = split(fillet1_piece_14, bisect_by=Plane(origin=(-26.158041494, 45.784971986, -15.502971493), z_dir=(0, -0.9514560077315756, 0.3077847711494059)), keep=Keep.TOP, mode=Mode.PRIVATE)
    add(fillet1_piece_14)
    with BuildSketch(Plane(origin=(-41.91, 18.095354636, 0), x_dir=(0, -1, 0), z_dir=(1, 0, 0))) as fillet1_piece_15_section:
        with BuildLine():
            CenterArc((FILLET1_R, FILLET1_R), FILLET1_R, 180, 90)
            Line((0, FILLET1_R), (0, 0))
            Line((0, 0), (FILLET1_R, 0))
        make_face()
    fillet1_piece_15 = extrude(amount=12.63, mode=Mode.PRIVATE)
    fillet1_piece_15 = split(fillet1_piece_15, bisect_by=Plane(origin=(-35.31348635, 17.523466314, -1.177612978), z_dir=(0.9787845391139913, 0, 0.20489223018799818)), keep=Keep.TOP, mode=Mode.PRIVATE)
    add(fillet1_piece_15)
    with BuildSketch(Plane(origin=(-22.671000124, -6.35, 0), x_dir=(1, 0, 0), z_dir=(0, 1, 0))) as fillet1_piece_16_section:
        with BuildLine():
            CenterArc((FILLET1_R, FILLET1_R), FILLET1_R, 180, 90)
            Line((0, FILLET1_R), (0, 0))
            Line((0, 0), (FILLET1_R, 0))
        make_face()
    fillet1_piece_16 = extrude(amount=30.795354636, mode=Mode.PRIVATE)
    fillet1_piece_16 = split(fillet1_piece_16, bisect_by=Plane(origin=(-22.099111802, 2.706169669, -4.486515557), z_dir=(0, 0.8562898373748625, 0.516495609282917)), keep=Keep.TOP, mode=Mode.PRIVATE)
    fillet1_piece_16 = split(fillet1_piece_16, bisect_by=Plane(origin=(-22.099111802, 19.595354636, -0.559647827), z_dir=(0, -1, 0)), keep=Keep.TOP, mode=Mode.PRIVATE)
    add(fillet1_piece_16)
    with BuildSketch(Plane(origin=(-24.449000124, 18.095354636, 6.35), x_dir=(0, -1, 0), z_dir=(0, 0, -1))) as fillet1_piece_17_section:
        with BuildLine():
            CenterArc((FILLET1_R, FILLET1_R), FILLET1_R, 180, 90)
            Line((0, FILLET1_R), (0, 0))
            Line((0, 0), (FILLET1_R, 0))
        make_face()
    fillet1_piece_17 = extrude(amount=42.7, mode=Mode.PRIVATE)
    fillet1_piece_17 = split(fillet1_piece_17, bisect_by=Plane(origin=(-25.023967677, 11.110148909, -18.419338773), z_dir=(0, 0.8562898373748625, 0.516495609282917)), keep=Keep.TOP, mode=Mode.PRIVATE)
    fillet1_piece_17 = split(fillet1_piece_17, bisect_by=Plane(origin=(-25.023967677, 17.540941062, 5.08), z_dir=(0, 0, -1)), keep=Keep.TOP, mode=Mode.PRIVATE)
    add(fillet1_piece_17)
    with BuildSketch(Plane(origin=(-11.110999876, 18.095354636, 6.35), x_dir=(1, 0, 0), z_dir=(0, 0, -1))) as fillet1_piece_18_section:
        with BuildLine():
            CenterArc((FILLET1_R, FILLET1_R), FILLET1_R, 180, 90)
            Line((0, FILLET1_R), (0, 0))
            Line((0, 0), (FILLET1_R, 0))
        make_face()
    fillet1_piece_18 = extrude(amount=42.7, mode=Mode.PRIVATE)
    fillet1_piece_18 = split(fillet1_piece_18, bisect_by=Plane(origin=(-10.536032323, 11.110148909, -18.419338773), z_dir=(0, 0.8562898373748625, 0.516495609282917)), keep=Keep.TOP, mode=Mode.PRIVATE)
    fillet1_piece_18 = split(fillet1_piece_18, bisect_by=Plane(origin=(-10.536032323, 17.540941062, 5.08), z_dir=(0, 0, -1)), keep=Keep.TOP, mode=Mode.PRIVATE)
    add(fillet1_piece_18)
    with BuildSketch(Plane(origin=(-12.888999876, -6.35, 0), x_dir=(-1, 0, 0), z_dir=(0, 1, 0))) as fillet1_piece_19_section:
        with BuildLine():
            CenterArc((FILLET1_R, -FILLET1_R), FILLET1_R, 90, 90)
            Line((0, -FILLET1_R), (0, 0))
            Line((0, 0), (FILLET1_R, 0))
        make_face()
    fillet1_piece_19 = extrude(amount=30.795354636, mode=Mode.PRIVATE)
    fillet1_piece_19 = split(fillet1_piece_19, bisect_by=Plane(origin=(-13.460888198, 2.706169669, -4.486515557), z_dir=(0, 0.8562898373748625, 0.516495609282917)), keep=Keep.TOP, mode=Mode.PRIVATE)
    fillet1_piece_19 = split(fillet1_piece_19, bisect_by=Plane(origin=(-13.460888198, 19.595354636, -0.559647827), z_dir=(0, -1, 0)), keep=Keep.TOP, mode=Mode.PRIVATE)
    add(fillet1_piece_19)
    with BuildSketch(Plane(origin=(6.35, 18.095354636, 0), x_dir=(0, -1, 0), z_dir=(-1, 0, 0))) as fillet1_piece_20_section:
        with BuildLine():
            CenterArc((FILLET1_R, -FILLET1_R), FILLET1_R, 90, 90)
            Line((0, -FILLET1_R), (0, 0))
            Line((0, 0), (FILLET1_R, 0))
        make_face()
    fillet1_piece_20 = extrude(amount=12.63, mode=Mode.PRIVATE)
    fillet1_piece_20 = split(fillet1_piece_20, bisect_by=Plane(origin=(-0.24651365, 17.523466314, -1.177612978), z_dir=(-0.9787845391139913, 0, 0.20489223018799815)), keep=Keep.TOP, mode=Mode.PRIVATE)
    add(fillet1_piece_20)
    with BuildSketch(Plane(origin=(-17.460999876, 18.095354636, 0), x_dir=(0, -1, 0), z_dir=(1, 0, 0))) as fillet1_piece_21_section:
        with BuildLine():
            CenterArc((FILLET1_R, FILLET1_R), FILLET1_R, 180, 90)
            Line((0, FILLET1_R), (0, 0))
            Line((0, 0), (FILLET1_R, 0))
        make_face()
    fillet1_piece_21 = extrude(amount=11.180999876, mode=Mode.PRIVATE)
    fillet1_piece_21 = split(fillet1_piece_21, bisect_by=Plane(origin=(-12.888999876, 17.528000071, -0.567354565), z_dir=(1, 0, 0)), keep=Keep.TOP, mode=Mode.PRIVATE)
    add(fillet1_piece_21)
    with BuildSketch(Plane(origin=(-29.28, 18.095354636, 0), x_dir=(0, -1, 0), z_dir=(1, 0, 0))) as fillet1_piece_22:
        with BuildLine():
            CenterArc((FILLET1_R, FILLET1_R), FILLET1_R, 180, 90)
            Line((-FILLET1_R * 1.03586780448e-10, FILLET1_R), (0, 0))
            Line((0, 0), (FILLET1_R, 0))
        make_face()
    extrude(amount=4.830999876)


solid = part.part
